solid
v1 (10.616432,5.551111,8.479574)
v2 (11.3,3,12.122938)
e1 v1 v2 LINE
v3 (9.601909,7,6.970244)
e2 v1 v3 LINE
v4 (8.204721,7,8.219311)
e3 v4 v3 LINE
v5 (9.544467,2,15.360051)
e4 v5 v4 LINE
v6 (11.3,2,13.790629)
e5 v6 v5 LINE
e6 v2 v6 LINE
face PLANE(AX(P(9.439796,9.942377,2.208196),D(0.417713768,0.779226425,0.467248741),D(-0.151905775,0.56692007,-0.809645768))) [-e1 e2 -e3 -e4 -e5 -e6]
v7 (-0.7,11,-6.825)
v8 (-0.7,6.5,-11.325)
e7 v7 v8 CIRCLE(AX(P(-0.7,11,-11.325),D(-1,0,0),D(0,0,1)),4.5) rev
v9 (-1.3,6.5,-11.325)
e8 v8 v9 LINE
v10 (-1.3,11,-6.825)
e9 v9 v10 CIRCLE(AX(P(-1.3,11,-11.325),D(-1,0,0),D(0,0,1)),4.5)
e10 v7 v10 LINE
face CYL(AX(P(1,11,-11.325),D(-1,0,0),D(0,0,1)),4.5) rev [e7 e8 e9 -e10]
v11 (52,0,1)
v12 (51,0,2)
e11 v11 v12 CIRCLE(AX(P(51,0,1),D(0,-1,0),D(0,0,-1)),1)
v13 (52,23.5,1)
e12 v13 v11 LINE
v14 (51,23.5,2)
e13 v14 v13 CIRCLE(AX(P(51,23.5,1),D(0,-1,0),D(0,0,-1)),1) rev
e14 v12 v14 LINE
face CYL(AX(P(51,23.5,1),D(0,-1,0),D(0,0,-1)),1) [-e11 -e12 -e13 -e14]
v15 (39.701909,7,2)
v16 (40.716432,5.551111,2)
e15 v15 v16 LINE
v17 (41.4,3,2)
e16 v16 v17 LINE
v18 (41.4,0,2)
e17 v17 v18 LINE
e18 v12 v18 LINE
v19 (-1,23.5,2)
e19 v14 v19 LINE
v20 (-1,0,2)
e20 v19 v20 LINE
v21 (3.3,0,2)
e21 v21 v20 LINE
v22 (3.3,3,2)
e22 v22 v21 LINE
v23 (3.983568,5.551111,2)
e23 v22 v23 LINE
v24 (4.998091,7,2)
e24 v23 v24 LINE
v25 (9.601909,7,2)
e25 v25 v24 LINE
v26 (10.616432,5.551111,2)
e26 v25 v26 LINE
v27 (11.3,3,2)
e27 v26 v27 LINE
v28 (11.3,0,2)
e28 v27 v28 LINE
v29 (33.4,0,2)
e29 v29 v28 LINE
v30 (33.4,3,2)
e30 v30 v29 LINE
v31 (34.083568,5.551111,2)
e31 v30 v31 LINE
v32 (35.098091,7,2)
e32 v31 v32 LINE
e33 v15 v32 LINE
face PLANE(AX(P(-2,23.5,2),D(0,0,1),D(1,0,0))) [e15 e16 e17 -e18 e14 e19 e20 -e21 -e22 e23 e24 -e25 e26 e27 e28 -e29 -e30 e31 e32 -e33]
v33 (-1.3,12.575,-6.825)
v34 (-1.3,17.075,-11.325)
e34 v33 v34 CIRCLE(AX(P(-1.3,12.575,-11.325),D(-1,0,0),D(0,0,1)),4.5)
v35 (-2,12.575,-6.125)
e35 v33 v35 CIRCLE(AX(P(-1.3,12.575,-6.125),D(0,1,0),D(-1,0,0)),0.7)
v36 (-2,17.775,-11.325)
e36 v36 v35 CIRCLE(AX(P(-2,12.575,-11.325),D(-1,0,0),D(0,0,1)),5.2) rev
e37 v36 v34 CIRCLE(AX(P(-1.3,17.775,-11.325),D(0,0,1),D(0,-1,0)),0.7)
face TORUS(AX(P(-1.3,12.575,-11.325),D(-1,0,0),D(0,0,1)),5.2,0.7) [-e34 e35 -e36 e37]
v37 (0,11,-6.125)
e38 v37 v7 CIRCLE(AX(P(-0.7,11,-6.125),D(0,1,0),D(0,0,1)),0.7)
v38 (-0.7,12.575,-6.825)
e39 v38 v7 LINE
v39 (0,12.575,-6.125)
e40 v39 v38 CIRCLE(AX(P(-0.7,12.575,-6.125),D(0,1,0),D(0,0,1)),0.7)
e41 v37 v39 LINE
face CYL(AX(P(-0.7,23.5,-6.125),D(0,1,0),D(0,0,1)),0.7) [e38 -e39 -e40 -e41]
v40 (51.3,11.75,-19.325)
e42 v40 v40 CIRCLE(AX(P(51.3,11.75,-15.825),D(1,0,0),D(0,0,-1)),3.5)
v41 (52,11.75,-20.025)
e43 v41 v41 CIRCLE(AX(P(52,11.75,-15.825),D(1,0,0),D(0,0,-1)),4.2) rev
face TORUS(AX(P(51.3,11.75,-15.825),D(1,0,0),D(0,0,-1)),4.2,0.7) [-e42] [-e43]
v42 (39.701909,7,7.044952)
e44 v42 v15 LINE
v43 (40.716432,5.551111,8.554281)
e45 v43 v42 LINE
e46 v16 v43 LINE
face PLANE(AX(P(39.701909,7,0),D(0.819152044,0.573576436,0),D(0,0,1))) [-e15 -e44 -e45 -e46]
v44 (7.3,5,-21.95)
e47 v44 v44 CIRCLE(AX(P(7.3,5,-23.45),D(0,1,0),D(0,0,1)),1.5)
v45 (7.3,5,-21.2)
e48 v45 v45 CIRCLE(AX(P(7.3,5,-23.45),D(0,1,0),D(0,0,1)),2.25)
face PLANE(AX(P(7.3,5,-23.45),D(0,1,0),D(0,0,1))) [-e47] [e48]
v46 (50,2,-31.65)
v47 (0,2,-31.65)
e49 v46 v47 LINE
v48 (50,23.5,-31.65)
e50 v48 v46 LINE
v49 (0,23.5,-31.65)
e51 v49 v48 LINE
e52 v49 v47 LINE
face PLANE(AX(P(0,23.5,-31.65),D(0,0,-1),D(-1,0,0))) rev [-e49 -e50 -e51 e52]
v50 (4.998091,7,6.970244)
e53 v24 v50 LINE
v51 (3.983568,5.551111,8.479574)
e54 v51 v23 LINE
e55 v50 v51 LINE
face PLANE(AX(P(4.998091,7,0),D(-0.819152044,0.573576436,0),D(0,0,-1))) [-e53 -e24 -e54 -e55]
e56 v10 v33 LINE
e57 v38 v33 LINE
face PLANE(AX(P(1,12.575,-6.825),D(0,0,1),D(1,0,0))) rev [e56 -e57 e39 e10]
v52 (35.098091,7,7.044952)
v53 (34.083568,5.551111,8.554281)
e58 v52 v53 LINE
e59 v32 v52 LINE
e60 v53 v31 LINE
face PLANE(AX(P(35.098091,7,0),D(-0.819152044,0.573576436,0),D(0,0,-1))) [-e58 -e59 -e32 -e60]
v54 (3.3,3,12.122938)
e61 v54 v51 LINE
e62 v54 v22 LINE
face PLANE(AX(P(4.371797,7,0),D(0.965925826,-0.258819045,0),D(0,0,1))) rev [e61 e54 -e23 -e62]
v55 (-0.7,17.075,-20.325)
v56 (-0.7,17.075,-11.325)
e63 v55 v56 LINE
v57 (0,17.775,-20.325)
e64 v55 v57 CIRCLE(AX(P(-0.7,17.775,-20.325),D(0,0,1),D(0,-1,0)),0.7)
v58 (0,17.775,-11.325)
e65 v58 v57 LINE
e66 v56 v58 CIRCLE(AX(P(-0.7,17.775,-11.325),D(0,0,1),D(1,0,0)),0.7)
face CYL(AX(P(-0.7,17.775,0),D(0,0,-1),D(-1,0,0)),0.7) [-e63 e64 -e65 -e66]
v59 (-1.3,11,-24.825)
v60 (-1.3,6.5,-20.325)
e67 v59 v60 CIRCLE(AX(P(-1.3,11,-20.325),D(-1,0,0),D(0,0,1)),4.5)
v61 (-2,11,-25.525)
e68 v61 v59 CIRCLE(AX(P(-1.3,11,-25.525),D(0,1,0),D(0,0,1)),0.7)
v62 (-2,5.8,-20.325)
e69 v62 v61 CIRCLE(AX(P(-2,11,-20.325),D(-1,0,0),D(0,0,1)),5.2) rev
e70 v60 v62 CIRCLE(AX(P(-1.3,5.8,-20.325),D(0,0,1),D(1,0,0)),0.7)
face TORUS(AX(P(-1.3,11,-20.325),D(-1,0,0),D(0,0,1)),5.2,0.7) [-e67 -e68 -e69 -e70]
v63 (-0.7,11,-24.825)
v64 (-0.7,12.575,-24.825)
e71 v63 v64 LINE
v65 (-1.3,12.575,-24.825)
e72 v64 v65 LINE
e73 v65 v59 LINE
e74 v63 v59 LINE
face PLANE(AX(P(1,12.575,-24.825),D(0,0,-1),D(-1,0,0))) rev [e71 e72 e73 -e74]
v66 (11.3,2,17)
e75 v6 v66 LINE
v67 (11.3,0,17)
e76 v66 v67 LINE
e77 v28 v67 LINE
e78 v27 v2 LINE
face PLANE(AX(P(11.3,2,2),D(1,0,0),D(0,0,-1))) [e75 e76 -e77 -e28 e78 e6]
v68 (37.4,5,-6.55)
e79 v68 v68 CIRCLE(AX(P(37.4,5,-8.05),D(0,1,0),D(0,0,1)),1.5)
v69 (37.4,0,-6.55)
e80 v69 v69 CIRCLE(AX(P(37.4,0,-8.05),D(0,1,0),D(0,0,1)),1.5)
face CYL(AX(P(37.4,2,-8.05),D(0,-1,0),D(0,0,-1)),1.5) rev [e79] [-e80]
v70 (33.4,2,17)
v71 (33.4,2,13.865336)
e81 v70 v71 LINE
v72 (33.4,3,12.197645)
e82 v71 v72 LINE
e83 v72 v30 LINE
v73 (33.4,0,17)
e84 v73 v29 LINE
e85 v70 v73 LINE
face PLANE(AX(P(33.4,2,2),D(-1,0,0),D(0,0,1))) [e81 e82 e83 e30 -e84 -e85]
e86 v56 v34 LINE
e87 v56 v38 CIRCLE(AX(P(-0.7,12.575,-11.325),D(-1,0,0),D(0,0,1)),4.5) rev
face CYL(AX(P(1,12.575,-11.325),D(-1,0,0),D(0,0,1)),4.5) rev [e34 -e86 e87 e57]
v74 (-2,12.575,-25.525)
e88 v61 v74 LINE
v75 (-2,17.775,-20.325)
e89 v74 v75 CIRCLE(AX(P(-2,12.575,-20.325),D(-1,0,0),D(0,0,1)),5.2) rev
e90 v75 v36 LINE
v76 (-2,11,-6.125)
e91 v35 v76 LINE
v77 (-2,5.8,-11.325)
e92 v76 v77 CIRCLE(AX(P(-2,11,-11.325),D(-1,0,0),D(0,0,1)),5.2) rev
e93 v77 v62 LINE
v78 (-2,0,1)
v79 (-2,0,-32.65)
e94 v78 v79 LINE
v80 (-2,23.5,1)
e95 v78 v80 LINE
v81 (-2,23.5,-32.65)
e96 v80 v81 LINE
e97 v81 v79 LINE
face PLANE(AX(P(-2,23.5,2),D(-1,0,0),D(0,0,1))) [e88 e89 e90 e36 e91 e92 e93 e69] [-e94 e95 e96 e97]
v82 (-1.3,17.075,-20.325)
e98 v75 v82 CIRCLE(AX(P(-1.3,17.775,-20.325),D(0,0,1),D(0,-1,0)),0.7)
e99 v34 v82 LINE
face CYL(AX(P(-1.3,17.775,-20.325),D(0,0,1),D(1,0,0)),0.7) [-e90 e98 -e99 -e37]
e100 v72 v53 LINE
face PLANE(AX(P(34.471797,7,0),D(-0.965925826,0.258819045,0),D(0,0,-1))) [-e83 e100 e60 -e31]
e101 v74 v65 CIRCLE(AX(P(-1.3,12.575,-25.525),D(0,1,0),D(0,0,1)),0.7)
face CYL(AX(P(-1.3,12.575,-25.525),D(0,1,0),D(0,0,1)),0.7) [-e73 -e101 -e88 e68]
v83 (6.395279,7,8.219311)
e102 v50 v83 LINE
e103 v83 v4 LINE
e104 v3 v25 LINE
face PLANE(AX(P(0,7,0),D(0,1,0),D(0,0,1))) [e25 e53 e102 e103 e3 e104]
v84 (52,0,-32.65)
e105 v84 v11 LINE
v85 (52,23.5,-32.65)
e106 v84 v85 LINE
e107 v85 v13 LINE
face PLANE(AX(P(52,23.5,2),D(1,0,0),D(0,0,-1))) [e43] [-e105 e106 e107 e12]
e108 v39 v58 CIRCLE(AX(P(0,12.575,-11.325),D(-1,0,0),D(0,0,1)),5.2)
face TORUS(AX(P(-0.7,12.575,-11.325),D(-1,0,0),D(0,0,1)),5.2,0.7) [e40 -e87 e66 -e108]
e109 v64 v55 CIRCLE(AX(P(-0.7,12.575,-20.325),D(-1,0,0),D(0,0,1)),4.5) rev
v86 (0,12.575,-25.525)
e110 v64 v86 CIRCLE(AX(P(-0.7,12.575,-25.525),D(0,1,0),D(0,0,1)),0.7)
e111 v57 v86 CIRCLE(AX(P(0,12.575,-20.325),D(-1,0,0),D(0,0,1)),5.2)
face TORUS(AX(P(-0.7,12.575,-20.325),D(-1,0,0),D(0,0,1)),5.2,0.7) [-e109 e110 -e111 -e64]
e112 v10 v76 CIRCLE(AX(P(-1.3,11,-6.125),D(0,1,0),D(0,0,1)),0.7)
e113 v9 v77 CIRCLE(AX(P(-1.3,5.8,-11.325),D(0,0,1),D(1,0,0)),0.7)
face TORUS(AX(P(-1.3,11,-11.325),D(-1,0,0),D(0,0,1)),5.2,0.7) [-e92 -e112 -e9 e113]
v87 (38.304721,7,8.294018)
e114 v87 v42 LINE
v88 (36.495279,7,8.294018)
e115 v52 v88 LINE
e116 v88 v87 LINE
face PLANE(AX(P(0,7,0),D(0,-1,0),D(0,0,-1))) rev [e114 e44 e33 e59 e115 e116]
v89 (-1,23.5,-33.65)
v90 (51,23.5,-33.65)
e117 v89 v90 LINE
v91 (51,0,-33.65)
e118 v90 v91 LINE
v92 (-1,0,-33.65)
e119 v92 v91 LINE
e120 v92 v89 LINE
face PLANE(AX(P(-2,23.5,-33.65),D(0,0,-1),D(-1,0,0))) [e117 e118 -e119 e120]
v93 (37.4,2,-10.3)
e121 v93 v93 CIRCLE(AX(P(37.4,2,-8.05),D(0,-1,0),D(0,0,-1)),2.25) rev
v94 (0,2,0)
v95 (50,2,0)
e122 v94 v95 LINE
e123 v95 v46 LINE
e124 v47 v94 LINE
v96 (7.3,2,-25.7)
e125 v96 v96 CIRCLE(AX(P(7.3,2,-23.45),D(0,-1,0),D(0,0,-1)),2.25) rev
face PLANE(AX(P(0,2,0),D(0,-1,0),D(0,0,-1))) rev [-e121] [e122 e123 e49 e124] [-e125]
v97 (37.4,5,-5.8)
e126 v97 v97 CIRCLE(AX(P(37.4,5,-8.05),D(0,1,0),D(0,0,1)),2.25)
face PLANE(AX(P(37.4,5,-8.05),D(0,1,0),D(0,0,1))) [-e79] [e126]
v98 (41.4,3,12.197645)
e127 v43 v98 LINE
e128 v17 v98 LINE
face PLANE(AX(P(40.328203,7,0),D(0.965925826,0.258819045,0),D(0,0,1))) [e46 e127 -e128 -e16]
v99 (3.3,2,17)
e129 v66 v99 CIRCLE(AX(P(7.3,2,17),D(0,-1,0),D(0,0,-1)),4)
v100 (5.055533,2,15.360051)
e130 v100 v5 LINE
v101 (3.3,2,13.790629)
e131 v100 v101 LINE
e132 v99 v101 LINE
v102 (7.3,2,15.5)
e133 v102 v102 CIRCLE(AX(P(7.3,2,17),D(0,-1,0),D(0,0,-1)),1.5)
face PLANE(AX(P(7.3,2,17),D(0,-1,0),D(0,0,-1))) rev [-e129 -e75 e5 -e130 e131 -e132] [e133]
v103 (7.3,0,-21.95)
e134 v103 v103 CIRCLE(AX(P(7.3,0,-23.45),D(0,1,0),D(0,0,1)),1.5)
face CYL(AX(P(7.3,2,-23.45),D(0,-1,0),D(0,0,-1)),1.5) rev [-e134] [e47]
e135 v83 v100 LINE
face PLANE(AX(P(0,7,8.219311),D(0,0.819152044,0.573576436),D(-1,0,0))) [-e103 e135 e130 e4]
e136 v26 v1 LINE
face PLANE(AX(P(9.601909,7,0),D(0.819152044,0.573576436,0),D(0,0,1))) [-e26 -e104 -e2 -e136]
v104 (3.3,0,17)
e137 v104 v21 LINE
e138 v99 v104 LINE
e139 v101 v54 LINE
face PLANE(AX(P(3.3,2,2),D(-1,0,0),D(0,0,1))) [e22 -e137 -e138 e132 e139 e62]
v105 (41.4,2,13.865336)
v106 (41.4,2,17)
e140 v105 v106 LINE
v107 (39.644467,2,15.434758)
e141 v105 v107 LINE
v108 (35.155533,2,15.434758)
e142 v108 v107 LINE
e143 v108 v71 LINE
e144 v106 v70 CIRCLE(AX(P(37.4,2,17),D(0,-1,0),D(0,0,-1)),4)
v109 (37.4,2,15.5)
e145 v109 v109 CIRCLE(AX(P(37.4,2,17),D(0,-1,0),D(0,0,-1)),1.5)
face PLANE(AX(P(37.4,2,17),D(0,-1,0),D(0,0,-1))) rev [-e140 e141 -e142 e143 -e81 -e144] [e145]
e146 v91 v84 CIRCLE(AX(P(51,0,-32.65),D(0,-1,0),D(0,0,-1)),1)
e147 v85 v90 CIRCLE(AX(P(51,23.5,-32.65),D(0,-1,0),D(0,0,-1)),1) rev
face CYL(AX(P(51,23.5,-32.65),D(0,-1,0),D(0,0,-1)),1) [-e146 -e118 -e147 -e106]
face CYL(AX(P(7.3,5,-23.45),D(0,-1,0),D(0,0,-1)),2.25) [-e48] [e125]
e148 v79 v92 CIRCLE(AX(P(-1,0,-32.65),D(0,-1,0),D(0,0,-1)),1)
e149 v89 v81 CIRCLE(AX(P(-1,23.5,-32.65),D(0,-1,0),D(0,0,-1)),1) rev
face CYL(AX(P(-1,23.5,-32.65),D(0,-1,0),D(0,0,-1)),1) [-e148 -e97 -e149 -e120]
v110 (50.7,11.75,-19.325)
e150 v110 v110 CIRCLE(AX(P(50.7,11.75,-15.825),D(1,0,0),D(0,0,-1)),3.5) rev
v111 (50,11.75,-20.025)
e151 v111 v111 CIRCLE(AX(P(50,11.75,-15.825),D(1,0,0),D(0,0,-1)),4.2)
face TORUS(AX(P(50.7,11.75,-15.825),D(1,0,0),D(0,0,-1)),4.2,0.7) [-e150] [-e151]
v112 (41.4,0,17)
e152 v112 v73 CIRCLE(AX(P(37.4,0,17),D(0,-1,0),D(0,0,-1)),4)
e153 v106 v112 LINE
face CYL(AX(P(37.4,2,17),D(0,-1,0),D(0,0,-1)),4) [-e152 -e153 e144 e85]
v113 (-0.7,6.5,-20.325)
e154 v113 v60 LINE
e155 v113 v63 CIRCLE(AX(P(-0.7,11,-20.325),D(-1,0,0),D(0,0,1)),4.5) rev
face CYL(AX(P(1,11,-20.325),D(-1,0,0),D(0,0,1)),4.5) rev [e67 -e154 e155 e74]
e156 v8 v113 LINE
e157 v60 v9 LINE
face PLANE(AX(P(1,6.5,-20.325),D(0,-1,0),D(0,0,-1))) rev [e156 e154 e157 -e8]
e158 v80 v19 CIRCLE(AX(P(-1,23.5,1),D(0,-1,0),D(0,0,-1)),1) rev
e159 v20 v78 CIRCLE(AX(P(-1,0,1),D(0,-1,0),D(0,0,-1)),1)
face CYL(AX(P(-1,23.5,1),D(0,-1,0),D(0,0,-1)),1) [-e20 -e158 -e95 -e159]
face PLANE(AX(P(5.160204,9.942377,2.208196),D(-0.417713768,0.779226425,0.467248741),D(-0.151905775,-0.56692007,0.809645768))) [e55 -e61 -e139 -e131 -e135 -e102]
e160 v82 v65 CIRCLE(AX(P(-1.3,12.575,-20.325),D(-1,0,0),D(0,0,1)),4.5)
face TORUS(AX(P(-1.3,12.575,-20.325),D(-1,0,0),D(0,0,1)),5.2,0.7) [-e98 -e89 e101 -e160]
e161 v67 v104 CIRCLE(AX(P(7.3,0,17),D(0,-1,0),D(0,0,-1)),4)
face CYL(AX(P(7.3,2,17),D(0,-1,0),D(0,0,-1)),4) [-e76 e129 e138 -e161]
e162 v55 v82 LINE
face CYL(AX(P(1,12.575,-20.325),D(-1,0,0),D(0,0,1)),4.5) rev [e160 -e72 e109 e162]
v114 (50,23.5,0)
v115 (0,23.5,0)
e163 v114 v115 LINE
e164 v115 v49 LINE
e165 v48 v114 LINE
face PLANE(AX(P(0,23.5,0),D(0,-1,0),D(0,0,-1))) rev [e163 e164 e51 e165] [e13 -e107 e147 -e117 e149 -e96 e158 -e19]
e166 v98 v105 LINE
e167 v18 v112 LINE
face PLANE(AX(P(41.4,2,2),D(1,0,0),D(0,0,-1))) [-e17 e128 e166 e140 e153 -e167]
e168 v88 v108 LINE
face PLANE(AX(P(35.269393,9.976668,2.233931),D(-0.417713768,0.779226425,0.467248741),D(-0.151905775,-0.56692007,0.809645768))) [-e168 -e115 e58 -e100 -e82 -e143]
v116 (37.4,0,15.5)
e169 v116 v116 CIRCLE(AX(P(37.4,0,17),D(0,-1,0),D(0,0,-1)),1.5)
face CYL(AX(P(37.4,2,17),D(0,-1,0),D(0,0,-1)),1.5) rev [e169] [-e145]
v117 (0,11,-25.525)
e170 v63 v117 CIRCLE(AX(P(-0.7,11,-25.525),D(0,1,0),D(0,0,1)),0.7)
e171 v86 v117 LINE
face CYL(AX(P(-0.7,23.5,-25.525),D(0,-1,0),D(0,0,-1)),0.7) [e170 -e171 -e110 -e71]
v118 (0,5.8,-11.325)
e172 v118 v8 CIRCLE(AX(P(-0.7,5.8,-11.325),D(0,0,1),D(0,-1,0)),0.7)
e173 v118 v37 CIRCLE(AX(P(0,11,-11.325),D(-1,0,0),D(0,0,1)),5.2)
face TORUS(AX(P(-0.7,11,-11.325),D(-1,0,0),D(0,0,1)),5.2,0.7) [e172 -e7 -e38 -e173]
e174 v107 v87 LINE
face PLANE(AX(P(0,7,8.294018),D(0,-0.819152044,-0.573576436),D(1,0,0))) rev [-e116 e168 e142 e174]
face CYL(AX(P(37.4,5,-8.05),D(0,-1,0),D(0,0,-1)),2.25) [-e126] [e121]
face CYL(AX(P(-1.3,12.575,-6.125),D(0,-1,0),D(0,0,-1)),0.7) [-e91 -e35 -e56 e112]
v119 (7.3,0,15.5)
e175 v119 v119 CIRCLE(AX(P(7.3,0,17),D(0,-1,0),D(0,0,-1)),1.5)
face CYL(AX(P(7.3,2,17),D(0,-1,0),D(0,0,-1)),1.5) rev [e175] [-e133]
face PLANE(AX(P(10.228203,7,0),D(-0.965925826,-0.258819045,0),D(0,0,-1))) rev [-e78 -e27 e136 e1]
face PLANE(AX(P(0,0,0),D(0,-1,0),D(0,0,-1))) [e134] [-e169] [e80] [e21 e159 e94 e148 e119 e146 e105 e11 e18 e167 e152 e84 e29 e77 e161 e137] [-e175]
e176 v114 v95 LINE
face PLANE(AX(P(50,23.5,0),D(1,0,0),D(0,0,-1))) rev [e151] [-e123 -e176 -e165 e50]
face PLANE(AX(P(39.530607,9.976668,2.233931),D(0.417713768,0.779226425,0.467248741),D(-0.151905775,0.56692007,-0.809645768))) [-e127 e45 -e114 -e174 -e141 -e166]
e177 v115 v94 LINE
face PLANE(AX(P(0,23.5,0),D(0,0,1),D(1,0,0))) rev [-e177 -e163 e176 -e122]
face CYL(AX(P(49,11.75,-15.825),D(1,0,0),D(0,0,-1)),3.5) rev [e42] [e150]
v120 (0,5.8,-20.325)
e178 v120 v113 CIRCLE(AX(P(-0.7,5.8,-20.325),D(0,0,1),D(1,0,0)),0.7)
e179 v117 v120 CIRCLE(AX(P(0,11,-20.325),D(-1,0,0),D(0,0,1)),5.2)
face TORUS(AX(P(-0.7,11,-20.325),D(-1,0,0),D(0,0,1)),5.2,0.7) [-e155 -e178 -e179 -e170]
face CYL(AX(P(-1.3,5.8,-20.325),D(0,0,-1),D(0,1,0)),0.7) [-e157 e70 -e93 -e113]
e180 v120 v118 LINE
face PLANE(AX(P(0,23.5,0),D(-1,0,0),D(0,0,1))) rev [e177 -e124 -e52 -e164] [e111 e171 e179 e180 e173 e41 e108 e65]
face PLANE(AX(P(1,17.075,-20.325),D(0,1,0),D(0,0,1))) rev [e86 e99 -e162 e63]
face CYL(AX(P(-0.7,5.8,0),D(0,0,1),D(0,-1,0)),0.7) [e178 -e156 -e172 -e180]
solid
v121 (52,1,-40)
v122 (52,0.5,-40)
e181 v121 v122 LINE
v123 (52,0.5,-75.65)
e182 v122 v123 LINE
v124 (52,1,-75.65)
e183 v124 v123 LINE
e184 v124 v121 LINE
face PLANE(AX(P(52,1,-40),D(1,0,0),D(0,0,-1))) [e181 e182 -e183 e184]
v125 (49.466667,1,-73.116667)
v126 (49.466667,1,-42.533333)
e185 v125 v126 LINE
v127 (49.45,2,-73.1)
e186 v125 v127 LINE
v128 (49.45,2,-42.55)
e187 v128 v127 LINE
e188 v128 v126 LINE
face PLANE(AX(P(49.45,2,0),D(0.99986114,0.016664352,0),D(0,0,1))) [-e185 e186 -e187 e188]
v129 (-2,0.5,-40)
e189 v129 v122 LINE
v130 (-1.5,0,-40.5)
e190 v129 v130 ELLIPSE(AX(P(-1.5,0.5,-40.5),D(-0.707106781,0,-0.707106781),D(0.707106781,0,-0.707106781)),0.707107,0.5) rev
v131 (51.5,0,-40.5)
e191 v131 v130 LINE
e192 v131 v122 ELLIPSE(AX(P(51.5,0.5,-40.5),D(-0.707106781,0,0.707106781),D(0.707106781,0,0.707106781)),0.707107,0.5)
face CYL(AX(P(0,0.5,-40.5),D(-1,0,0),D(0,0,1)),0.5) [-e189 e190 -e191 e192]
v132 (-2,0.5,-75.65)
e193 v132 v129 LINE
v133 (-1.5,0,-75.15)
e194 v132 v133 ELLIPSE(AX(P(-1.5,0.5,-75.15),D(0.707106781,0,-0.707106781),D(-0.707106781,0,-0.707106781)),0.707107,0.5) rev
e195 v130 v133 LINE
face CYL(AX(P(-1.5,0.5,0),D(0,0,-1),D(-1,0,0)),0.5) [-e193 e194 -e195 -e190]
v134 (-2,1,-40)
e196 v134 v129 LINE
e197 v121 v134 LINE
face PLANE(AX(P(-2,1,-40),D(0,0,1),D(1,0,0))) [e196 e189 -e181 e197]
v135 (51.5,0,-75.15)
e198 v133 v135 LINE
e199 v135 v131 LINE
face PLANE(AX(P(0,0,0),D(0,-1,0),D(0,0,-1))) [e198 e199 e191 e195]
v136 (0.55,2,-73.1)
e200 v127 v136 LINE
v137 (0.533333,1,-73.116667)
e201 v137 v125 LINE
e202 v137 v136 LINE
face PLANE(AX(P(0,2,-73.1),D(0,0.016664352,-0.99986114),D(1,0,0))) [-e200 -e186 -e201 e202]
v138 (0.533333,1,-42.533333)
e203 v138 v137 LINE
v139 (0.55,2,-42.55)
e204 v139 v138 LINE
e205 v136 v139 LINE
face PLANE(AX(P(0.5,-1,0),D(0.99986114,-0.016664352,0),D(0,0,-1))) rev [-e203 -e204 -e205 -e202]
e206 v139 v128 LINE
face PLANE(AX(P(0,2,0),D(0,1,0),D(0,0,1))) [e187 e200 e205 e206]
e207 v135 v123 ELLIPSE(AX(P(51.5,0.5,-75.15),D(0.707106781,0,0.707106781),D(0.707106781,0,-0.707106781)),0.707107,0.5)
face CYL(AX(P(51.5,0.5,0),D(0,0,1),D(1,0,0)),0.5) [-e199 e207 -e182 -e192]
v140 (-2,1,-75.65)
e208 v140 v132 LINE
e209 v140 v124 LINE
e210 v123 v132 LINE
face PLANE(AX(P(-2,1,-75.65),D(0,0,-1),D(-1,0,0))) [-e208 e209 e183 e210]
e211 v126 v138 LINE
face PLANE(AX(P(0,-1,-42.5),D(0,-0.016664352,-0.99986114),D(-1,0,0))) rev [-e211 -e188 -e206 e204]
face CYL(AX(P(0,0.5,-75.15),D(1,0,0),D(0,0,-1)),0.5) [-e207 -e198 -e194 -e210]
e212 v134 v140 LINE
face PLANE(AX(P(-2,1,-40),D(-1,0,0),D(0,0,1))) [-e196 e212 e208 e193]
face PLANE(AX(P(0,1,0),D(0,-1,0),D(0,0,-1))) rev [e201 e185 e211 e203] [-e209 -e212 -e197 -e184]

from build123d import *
from OCP.BRepFilletAPI import BRepFilletAPI_MakeChamfer

# Parameters (mm, degrees)
CROQUIS1_W              = 50
CROQUIS1_H              = 31.65
CROQUIS1_R              = 1.5
SALIENTE_EXTRUIR1_DEPTH = 2
CROQUIS2_W              = 54
CROQUIS2_H              = 35.65
CROQUIS2_W_2            = 50
CROQUIS2_H_2            = 31.65
SALIENTE_EXTRUIR2_DEPTH = 23.5
CROQUIS3_R              = 2.25
CROQUIS3_R_2            = 1.5
SALIENTE_EXTRUIR3_DEPTH = 3
CORTAR_EXTRUIR1_DEPTH   = 3
CROQUIS5_R              = 3.5
CORTAR_EXTRUIR2_DEPTH   = 3
REDONDEO2_R             = 0.7
CROQUIS6_R              = 1.5
SALIENTE_EXTRUIR4_DEPTH = 2
CROQUIS7_W              = 8
CROQUIS7_H              = 13.434758297
CROQUIS7_H_2            = 13.360050844
SALIENTE_EXTRUIR5_DEPTH = 5
CHAFL_N1_SIZE           = 4
CHAFL_N1_SIZE2          = 1.07179677
CHAFL_N2_SIZE           = 7.140740034
CHAFL_N2_SIZE_2         = 5
CHAFL_N3_SIZE           = 2
CHAFL_N3_SIZE_2         = 1.061715873
REDONDEO3_R             = 0.7
CROQUIS10_W             = 54
CROQUIS10_H             = 35.65
SALIENTE_EXTRUIR8_DEPTH = 1
CROQUIS11_W             = 49
CROQUIS11_H             = 30.65
SALIENTE_EXTRUIR9_DEPTH = 1
REDONDEO4_R             = 1
CHAFL_N4_SIZE           = 3
CHAFL_N4_SIZE_2         = 0.05
REDONDEO5_R             = 0.5
CHAFL_N6_SIZE           = 1.5
CHAFL_N6_SIZE2          = 0.62629425


# Some blends are built 0.0001 mm under size
with BuildPart() as part:
    # Croquis1 → Saliente-Extruir1 (new body)
    with BuildSketch(Plane(origin=(0, 0, 0), x_dir=(1, 0, 0), z_dir=(0, 1, 0))):
        with Locations((25, 15.825)):
            Rectangle(CROQUIS1_W, CROQUIS1_H)
        with Locations(Location((7.3, 23.45, 0), (0, 0, 270))):
            Circle(CROQUIS1_R, mode=Mode.SUBTRACT)
        with Locations(Location((37.4, 8.05, 0), (0, 0, 270))):
            Circle(CROQUIS1_R, mode=Mode.SUBTRACT)
    extrude(amount=SALIENTE_EXTRUIR1_DEPTH)

    # Croquis2 → Saliente-Extruir2 (add)
    with BuildSketch(Plane.XZ):
        with Locations((25, -15.825)):
            Rectangle(CROQUIS2_W, CROQUIS2_H)
        with Locations((25, -15.825)):
            Rectangle(CROQUIS2_W_2, CROQUIS2_H_2, mode=Mode.SUBTRACT)
    extrude(amount=-SALIENTE_EXTRUIR2_DEPTH)

    # Croquis3 → Saliente-Extruir3 (add)
    # profile 1 of 2: a face of its own
    with BuildSketch(Plane(origin=(0, 2, 0), x_dir=(1, 0, 0), z_dir=(0, 1, 0))):
        with Locations(Location((7.3, 23.45, 0), (0, 0, 90))):
            Circle(CROQUIS3_R)
        with Locations(Location((7.3, 23.45, 0), (0, 0, 270))):
            Circle(CROQUIS3_R_2, mode=Mode.SUBTRACT)
    # profile 2 of 2: a face of its own
    with BuildSketch(Plane(origin=(0, 2, 0), x_dir=(1, 0, 0), z_dir=(0, 1, 0))):
        with Locations(Location((37.4, 8.05, 0), (0, 0, 90))):
            Circle(CROQUIS3_R)
        with Locations(Location((37.4, 8.05, 0), (0, 0, 270))):
            Circle(CROQUIS3_R_2, mode=Mode.SUBTRACT)
    extrude(amount=SALIENTE_EXTRUIR3_DEPTH)

    # Croquis4 → Cortar-Extruir1 (cut)
    with BuildSketch(Plane.ZY.offset(2)):
        with BuildLine():
            Line((-20.325, 17.075), (-11.325, 17.075))
            ThreePointArc((-11.325, 17.075), (-8.143019485, 15.756980515), (-6.825, 12.575))
            Line((-6.825, 12.575), (-6.825, 11))
            ThreePointArc((-6.825, 11), (-8.143019485, 7.818019485), (-11.325, 6.5))
            Line((-11.325, 6.5), (-20.325, 6.5))
            ThreePointArc((-20.325, 6.5), (-23.506980515, 7.818019485), (-24.825, 11))
            Line((-24.825, 11), (-24.825, 12.575))
            ThreePointArc((-24.825, 12.575), (-23.506980515, 15.756980515), (-20.325, 17.075))
        make_face()
    extrude(amount=-CORTAR_EXTRUIR1_DEPTH, mode=Mode.SUBTRACT)

    # Croquis5 → Cortar-Extruir2 (cut)
    with BuildSketch(Plane(origin=(52, 0, 0), x_dir=(0, 0, -1), z_dir=(1, 0, 0))):
        with Locations((15.825, 11.75)):
            Circle(CROQUIS5_R)
    extrude(amount=-CORTAR_EXTRUIR2_DEPTH, mode=Mode.SUBTRACT)

    # Redondeo2
    redondeo2_edges = [part.edges().sort_by_distance(p)[0] for p in [
        (0, 7.818019485, -23.506980515),
        (0, 11.7875, -24.825),
        (0, 15.756980515, -23.506980515),
        (0, 17.075, -15.825),
        (0, 15.756980515, -8.143019485),
        (0, 11.7875, -6.825),
        (0, 7.818019485, -8.143019485),
        (0, 6.5, -15.825),
        (-2, 7.818019485, -23.506980515),
        (-2, 6.5, -15.825),
        (-2, 7.818019485, -8.143019485),
        (-2, 11.7875, -6.825),
        (-2, 15.756980515, -8.143019485),
        (-2, 17.075, -15.825),
        (-2, 15.756980515, -23.506980515),
        (-2, 11.7875, -24.825),
    ]]
    fillet(redondeo2_edges, radius=REDONDEO2_R)

    # Croquis6 → Saliente-Extruir4 (add)
    # profile 1 of 2: a face of its own
    with BuildSketch(Plane(origin=(0, 0, 0), x_dir=(-1, 0, 0), z_dir=(0, -1, 0))):
        with BuildLine():
            Line((-33.4, -2), (-33.4, -17))
            ThreePointArc((-33.4, -17), (-37.4, -21), (-41.4, -17))
            Line((-41.4, -17), (-41.4, -2))
            Line((-41.4, -2), (-33.4, -2))
        make_face()
        with Locations(Location((-37.4, -17, 0), (0, 0, 90))):
            Circle(CROQUIS6_R, mode=Mode.SUBTRACT)
    # profile 2 of 2: a face of its own
    with BuildSketch(Plane(origin=(0, 0, 0), x_dir=(-1, 0, 0), z_dir=(0, -1, 0))):
        with BuildLine():
            Line((-3.3, -2), (-3.3, -17))
            ThreePointArc((-3.3, -17), (-7.3, -21), (-11.3, -17))
            Line((-11.3, -17), (-11.3, -2))
            Line((-11.3, -2), (-3.3, -2))
        make_face()
        with Locations(Location((-7.3, -17, 0), (0, 0, 90))):
            Circle(CROQUIS6_R, mode=Mode.SUBTRACT)
    extrude(amount=-SALIENTE_EXTRUIR4_DEPTH)

    # Croquis7 → Saliente-Extruir5 (add)
    with BuildSketch(Plane(origin=(0, 2, 0), x_dir=(1, 0, 0), z_dir=(0, 1, 0))):
        with Locations((37.4, -8.717379149)):
            Rectangle(CROQUIS7_W, CROQUIS7_H)
        with Locations((7.3, -8.680025422)):
            Rectangle(CROQUIS7_W, CROQUIS7_H_2)
    extrude(amount=SALIENTE_EXTRUIR5_DEPTH)

    # Chaflán1: one chamfer whose edges measure the first distance from different faces: ONE call of the kernel's chamfer builder (chamfer() names one face for all edges)
    chafl_n1_edges_1 = [part.edges().sort_by_distance(p)[0] for p in [
        (33.4, 7, 8.717379148),
    ]]
    chafl_n1_side_1 = [part.faces().sort_by_distance(p)[0] for p in [
        (33.4, 3.419461736, 8.958993942),
    ]]
    chafl_n1_edges_2 = [part.edges().sort_by_distance(p)[0] for p in [
        (41.4, 7, 8.717379148),
    ]]
    chafl_n1_side_2 = [part.faces().sort_by_distance(p)[0] for p in [
        (41.4, 3.419461736, 8.958993942),
    ]]
    chafl_n1_edges_3 = [part.edges().sort_by_distance(p)[0] for p in [
        (11.3, 7, 8.680025422),
    ]]
    chafl_n1_side_3 = [part.faces().sort_by_distance(p)[0] for p in [
        (11.3, 3.415292105, 8.934149107),
    ]]
    chafl_n1_edges_4 = [part.edges().sort_by_distance(p)[0] for p in [
        (3.3, 7, 8.680025422),
    ]]
    chafl_n1_side_4 = [part.faces().sort_by_distance(p)[0] for p in [
        (3.3, 3.415292105, 8.934149107),
    ]]
    chafl_n1 = BRepFilletAPI_MakeChamfer(part.part.solid().wrapped)
    for e in chafl_n1_edges_1:
        chafl_n1.Add(CHAFL_N1_SIZE, CHAFL_N1_SIZE2, e.wrapped, chafl_n1_side_1[0].wrapped)  # the first distance lies on this face
    for e in chafl_n1_edges_2:
        chafl_n1.Add(CHAFL_N1_SIZE, CHAFL_N1_SIZE2, e.wrapped, chafl_n1_side_2[0].wrapped)  # the first distance lies on this face
    for e in chafl_n1_edges_3:
        chafl_n1.Add(CHAFL_N1_SIZE, CHAFL_N1_SIZE2, e.wrapped, chafl_n1_side_3[0].wrapped)  # the first distance lies on this face
    for e in chafl_n1_edges_4:
        chafl_n1.Add(CHAFL_N1_SIZE, CHAFL_N1_SIZE2, e.wrapped, chafl_n1_side_4[0].wrapped)  # the first distance lies on this face
    add(Compound.cast(chafl_n1.Shape()), mode=Mode.REPLACE)

    # Chaflán2
    chafl_n2_edges_1 = [part.edges().sort_by_distance(p)[0] for p in [
        (7.3, 7, 15.360050844),
    ]]
    chafl_n2_side_1 = [part.faces().sort_by_distance(p)[0] for p in [
        (7.3, 7, 15.260050844),
    ]]
    chafl_n2_edges_2 = [part.edges().sort_by_distance(p)[0] for p in [
        (37.4, 7, 15.434758297),
    ]]
    chafl_n2_side_2 = [part.faces().sort_by_distance(p)[0] for p in [
        (37.4, 7, 15.334758297),
    ]]
    chafl_n2 = BRepFilletAPI_MakeChamfer(part.part.solid().wrapped)
    for e in chafl_n2_edges_1:
        chafl_n2.Add(CHAFL_N2_SIZE - 0.0001, CHAFL_N2_SIZE_2 - 0.0001, e.wrapped, chafl_n2_side_1[0].wrapped)
    for e in chafl_n2_edges_2:
        chafl_n2.Add(CHAFL_N2_SIZE - 0.0001, CHAFL_N2_SIZE_2 - 0.0001, e.wrapped, chafl_n2_side_2[0].wrapped)
    add(Compound.cast(chafl_n2.Shape()), mode=Mode.REPLACE)  # a hair under: the kernel refuses the full size

    # Chaflán3
    # the kernel refuses this chamfer: 2, 1.061715873 mm, written as the material it takes off along each edge
    with BuildSketch(Plane(origin=(39.541038051, 9.937740445, 4.098564946), x_dir=(-0.9882635792671295, -0.07375593896843995, 0.13377279006212586), z_dir=(0.15190517787522226, -0.566917841763116, 0.8096474403253232))) as chafl_n3_piece_1_section:
        Polygon((CHAFL_N3_SIZE * 0.999866964113, CHAFL_N3_SIZE * 0.0163111641311), (-CHAFL_N3_SIZE_2 * 0.227924724336, CHAFL_N3_SIZE_2 * 0.973678756308), (0, 0), align=None)
    chafl_n3_piece_1 = extrude(amount=17.419597977, mode=Mode.PRIVATE)
    chafl_n3_piece_1 = split(chafl_n3_piece_1, bisect_by=Plane(origin=(40.297919966, 2, 11.036319087), z_dir=(0, 1, 0)), keep=Keep.TOP, mode=Mode.PRIVATE)
    add(chafl_n3_piece_1, mode=Mode.SUBTRACT)
    with BuildSketch(Plane(origin=(35.258961949, 9.937740445, 4.098564946), x_dir=(0.9882635792671295, -0.07375593896843995, 0.13377279006212586), z_dir=(-0.15190517787522226, -0.566917841763116, 0.8096474403253232))) as chafl_n3_piece_2_section:
        Polygon((CHAFL_N3_SIZE * 0.999866964113, -CHAFL_N3_SIZE * 0.0163111641311), (-CHAFL_N3_SIZE_2 * 0.227924724336, -CHAFL_N3_SIZE_2 * 0.973678756308), (0, 0), align=None)
    chafl_n3_piece_2 = extrude(amount=17.419597977, mode=Mode.PRIVATE)
    chafl_n3_piece_2 = split(chafl_n3_piece_2, bisect_by=Plane(origin=(34.502080034, 2, 11.036319122), z_dir=(0, 1, 0)), keep=Keep.TOP, mode=Mode.PRIVATE)
    add(chafl_n3_piece_2, mode=Mode.SUBTRACT)
    with BuildSketch(Plane(origin=(9.441038051, 9.937740445, 4.023857494), x_dir=(0.2645325925952416, -0.7659513941920656, -0.5859530435026945), z_dir=(0.15190517787522226, -0.566917841763116, 0.8096474403253232))) as chafl_n3_piece_3_section:
        Polygon((CHAFL_N3_SIZE_2 * 0.998358379547, -CHAFL_N3_SIZE_2 * 0.0572760546561), (-CHAFL_N3_SIZE * 0.267638518525, -CHAFL_N3_SIZE * 0.963519394409), (0, 0), align=None)
    chafl_n3_piece_3 = extrude(amount=17.419597977, mode=Mode.PRIVATE)
    chafl_n3_piece_3 = split(chafl_n3_piece_3, bisect_by=Plane(origin=(10.197993246, 2, 10.977264195), z_dir=(0, 1, 0)), keep=Keep.TOP, mode=Mode.PRIVATE)
    add(chafl_n3_piece_3, mode=Mode.SUBTRACT)
    with BuildSketch(Plane(origin=(5.158961949, 9.937740445, 4.023857494), x_dir=(-0.2645325925952419, -0.7659513941920656, -0.5859530435026947), z_dir=(-0.15190517787522234, -0.566917841763116, 0.8096474403253232))) as chafl_n3_piece_4_section:
        Polygon((CHAFL_N3_SIZE_2 * 0.998358379547, CHAFL_N3_SIZE_2 * 0.0572760546561), (-CHAFL_N3_SIZE * 0.267638518525, CHAFL_N3_SIZE * 0.963519394409), (0, 0), align=None)
    chafl_n3_piece_4 = extrude(amount=17.419597977, mode=Mode.PRIVATE)
    chafl_n3_piece_4 = split(chafl_n3_piece_4, bisect_by=Plane(origin=(4.402006753, 2, 10.977264231), z_dir=(0, 1, 0)), keep=Keep.TOP, mode=Mode.PRIVATE)
    add(chafl_n3_piece_4, mode=Mode.SUBTRACT)

    # Redondeo3
    redondeo3_edges = [part.edges().sort_by_distance(p)[0] for p in [
        (50, 11.75, -12.325),
        (52, 11.75, -12.325),
    ]]
    fillet(redondeo3_edges, radius=REDONDEO3_R)

    # Redondeo4
    redondeo4_edges = [part.edges().sort_by_distance(p)[0] for p in [
        (52, 11.75, 2),
        (52, 11.75, -33.65),
        (-2, 11.75, -33.65),
        (-2, 11.75, 2),
    ]]
    fillet(redondeo4_edges, radius=REDONDEO4_R)

    # Chaflán6: one chamfer whose edges measure the first distance from different faces: ONE call of the kernel's chamfer builder (chamfer() names one face for all edges)
    chafl_n6_edges_1 = [part.edges().sort_by_distance(p)[0] for p in [
        (34.47179677, 7, 4.242572884),
    ]]
    chafl_n6_side_1 = [part.faces().sort_by_distance(p)[0] for p in [
        (33.866398411, 4.740622568, 5.855945246),
    ]]
    chafl_n6_edges_2 = [part.edges().sort_by_distance(p)[0] for p in [
        (4.37179677, 7, 4.205219158),
    ]]
    chafl_n6_side_2 = [part.faces().sort_by_distance(p)[0] for p in [
        (3.765683901, 4.737955981, 5.820495672),
    ]]
    chafl_n6_edges_3 = [part.edges().sort_by_distance(p)[0] for p in [
        (40.32820323, 7, 4.242572884),
    ]]
    chafl_n6_side_3 = [part.faces().sort_by_distance(p)[0] for p in [
        (40.933601589, 4.740622568, 5.855945246),
    ]]
    chafl_n6_edges_4 = [part.edges().sort_by_distance(p)[0] for p in [
        (10.22820323, 7, 4.205219158),
    ]]
    chafl_n6_side_4 = [part.faces().sort_by_distance(p)[0] for p in [
        (10.834316099, 4.737955981, 5.820495672),
    ]]
    chafl_n6 = BRepFilletAPI_MakeChamfer(part.part.solid().wrapped)
    for e in chafl_n6_edges_1:
        chafl_n6.Add(CHAFL_N6_SIZE, CHAFL_N6_SIZE2, e.wrapped, chafl_n6_side_1[0].wrapped)  # the first distance lies on this face
    for e in chafl_n6_edges_2:
        chafl_n6.Add(CHAFL_N6_SIZE, CHAFL_N6_SIZE2, e.wrapped, chafl_n6_side_2[0].wrapped)  # the first distance lies on this face
    for e in chafl_n6_edges_3:
        chafl_n6.Add(CHAFL_N6_SIZE, CHAFL_N6_SIZE2, e.wrapped, chafl_n6_side_3[0].wrapped)  # the first distance lies on this face
    for e in chafl_n6_edges_4:
        chafl_n6.Add(CHAFL_N6_SIZE, CHAFL_N6_SIZE2, e.wrapped, chafl_n6_side_4[0].wrapped)  # the first distance lies on this face
    add(Compound.cast(chafl_n6.Shape()), mode=Mode.REPLACE)


with BuildPart() as body_2:
    # Croquis10 → Saliente-Extruir8 (new body)
    with BuildSketch(Plane.XZ):
        with Locations((25, -57.825)):
            Rectangle(CROQUIS10_W, CROQUIS10_H)
    extrude(amount=-SALIENTE_EXTRUIR8_DEPTH)

    # Croquis11 → Saliente-Extruir9 (add)
    with BuildSketch(Plane(origin=(0, 1, 0), x_dir=(1, 0, 0), z_dir=(0, 1, 0))):
        with Locations((25, 57.825)):
            Rectangle(CROQUIS11_W, CROQUIS11_H)
    extrude(amount=SALIENTE_EXTRUIR9_DEPTH)

    # Chaflán4
    # the kernel refuses this chamfer: 3, 0.05 mm, written as the material it takes off along each edge
    with BuildSketch(Plane(origin=(49.5, 2, -80.949959944), x_dir=(0.0006409399196931217, -0.9999997945979885, 0), z_dir=(0, 0, 1))) as chafl_n4_piece_1_section:
        Polygon((CHAFL_N4_SIZE * 0.999999794598, -CHAFL_N4_SIZE * 0.000640939919693), (-CHAFL_N4_SIZE_2 * 0.000640939919693, -CHAFL_N4_SIZE_2 * 0.999999794598), (0, 0), align=None)
    chafl_n4_piece_1 = extrude(amount=46.249919888, mode=Mode.PRIVATE)
    chafl_n4_piece_1 = split(chafl_n4_piece_1, bisect_by=Plane(origin=(49.478888889, 1, -57.825), z_dir=(0, 1, 0)), keep=Keep.TOP, mode=Mode.PRIVATE)
    add(chafl_n4_piece_1, mode=Mode.SUBTRACT)
    with BuildSketch(Plane(origin=(-7.299959944, 2, -73.15), x_dir=(0, -0.9999997945979885, -0.0006409399196908443), z_dir=(1, 0, 0))) as chafl_n4_piece_2_section:
        Polygon((CHAFL_N4_SIZE * 0.999999794598, -CHAFL_N4_SIZE * 0.000640939919691), (-CHAFL_N4_SIZE_2 * 0.000640939919691, -CHAFL_N4_SIZE_2 * 0.999999794598), (0, 0), align=None)
    chafl_n4_piece_2 = extrude(amount=64.599919888, mode=Mode.PRIVATE)
    chafl_n4_piece_2 = split(chafl_n4_piece_2, bisect_by=Plane(origin=(25, 1, -73.128888889), z_dir=(0, 1, 0)), keep=Keep.TOP, mode=Mode.PRIVATE)
    add(chafl_n4_piece_2, mode=Mode.SUBTRACT)
    with BuildSketch(Plane(origin=(57.299959944, 2, -42.5), x_dir=(0, -0.9999997945979885, 0.0006409399196931217), z_dir=(-1, 0, 0))) as chafl_n4_piece_3_section:
        Polygon((CHAFL_N4_SIZE * 0.999999794598, -CHAFL_N4_SIZE * 0.000640939919693), (-CHAFL_N4_SIZE_2 * 0.000640939919693, -CHAFL_N4_SIZE_2 * 0.999999794598), (0, 0), align=None)
    chafl_n4_piece_3 = extrude(amount=64.599919888, mode=Mode.PRIVATE)
    chafl_n4_piece_3 = split(chafl_n4_piece_3, bisect_by=Plane(origin=(25, 1, -42.521111111), z_dir=(0, 1, 0)), keep=Keep.TOP, mode=Mode.PRIVATE)
    add(chafl_n4_piece_3, mode=Mode.SUBTRACT)
    with BuildSketch(Plane(origin=(0.5, 2, -34.700040056), x_dir=(-0.0006409399196920719, -0.9999997945979885, 0), z_dir=(0, 0, -1))) as chafl_n4_piece_4_section:
        Polygon((CHAFL_N4_SIZE * 0.999999794598, -CHAFL_N4_SIZE * 0.000640939919692), (-CHAFL_N4_SIZE_2 * 0.000640939919692, -CHAFL_N4_SIZE_2 * 0.999999794598), (0, 0), align=None)
    chafl_n4_piece_4 = extrude(amount=46.249919888, mode=Mode.PRIVATE)
    chafl_n4_piece_4 = split(chafl_n4_piece_4, bisect_by=Plane(origin=(0.521111111, 1, -57.825), z_dir=(0, 1, 0)), keep=Keep.TOP, mode=Mode.PRIVATE)
    add(chafl_n4_piece_4, mode=Mode.SUBTRACT)

    # Redondeo5
    redondeo5_edges = [body_2.edges().sort_by_distance(p)[0] for p in [
        (25, 0, -40),
        (52, 0, -57.825),
        (25, 0, -75.65),
        (-2, 0, -57.825),
    ]]
    fillet(redondeo5_edges, radius=REDONDEO5_R)


solid = Compound([part.part, body_2.part])
